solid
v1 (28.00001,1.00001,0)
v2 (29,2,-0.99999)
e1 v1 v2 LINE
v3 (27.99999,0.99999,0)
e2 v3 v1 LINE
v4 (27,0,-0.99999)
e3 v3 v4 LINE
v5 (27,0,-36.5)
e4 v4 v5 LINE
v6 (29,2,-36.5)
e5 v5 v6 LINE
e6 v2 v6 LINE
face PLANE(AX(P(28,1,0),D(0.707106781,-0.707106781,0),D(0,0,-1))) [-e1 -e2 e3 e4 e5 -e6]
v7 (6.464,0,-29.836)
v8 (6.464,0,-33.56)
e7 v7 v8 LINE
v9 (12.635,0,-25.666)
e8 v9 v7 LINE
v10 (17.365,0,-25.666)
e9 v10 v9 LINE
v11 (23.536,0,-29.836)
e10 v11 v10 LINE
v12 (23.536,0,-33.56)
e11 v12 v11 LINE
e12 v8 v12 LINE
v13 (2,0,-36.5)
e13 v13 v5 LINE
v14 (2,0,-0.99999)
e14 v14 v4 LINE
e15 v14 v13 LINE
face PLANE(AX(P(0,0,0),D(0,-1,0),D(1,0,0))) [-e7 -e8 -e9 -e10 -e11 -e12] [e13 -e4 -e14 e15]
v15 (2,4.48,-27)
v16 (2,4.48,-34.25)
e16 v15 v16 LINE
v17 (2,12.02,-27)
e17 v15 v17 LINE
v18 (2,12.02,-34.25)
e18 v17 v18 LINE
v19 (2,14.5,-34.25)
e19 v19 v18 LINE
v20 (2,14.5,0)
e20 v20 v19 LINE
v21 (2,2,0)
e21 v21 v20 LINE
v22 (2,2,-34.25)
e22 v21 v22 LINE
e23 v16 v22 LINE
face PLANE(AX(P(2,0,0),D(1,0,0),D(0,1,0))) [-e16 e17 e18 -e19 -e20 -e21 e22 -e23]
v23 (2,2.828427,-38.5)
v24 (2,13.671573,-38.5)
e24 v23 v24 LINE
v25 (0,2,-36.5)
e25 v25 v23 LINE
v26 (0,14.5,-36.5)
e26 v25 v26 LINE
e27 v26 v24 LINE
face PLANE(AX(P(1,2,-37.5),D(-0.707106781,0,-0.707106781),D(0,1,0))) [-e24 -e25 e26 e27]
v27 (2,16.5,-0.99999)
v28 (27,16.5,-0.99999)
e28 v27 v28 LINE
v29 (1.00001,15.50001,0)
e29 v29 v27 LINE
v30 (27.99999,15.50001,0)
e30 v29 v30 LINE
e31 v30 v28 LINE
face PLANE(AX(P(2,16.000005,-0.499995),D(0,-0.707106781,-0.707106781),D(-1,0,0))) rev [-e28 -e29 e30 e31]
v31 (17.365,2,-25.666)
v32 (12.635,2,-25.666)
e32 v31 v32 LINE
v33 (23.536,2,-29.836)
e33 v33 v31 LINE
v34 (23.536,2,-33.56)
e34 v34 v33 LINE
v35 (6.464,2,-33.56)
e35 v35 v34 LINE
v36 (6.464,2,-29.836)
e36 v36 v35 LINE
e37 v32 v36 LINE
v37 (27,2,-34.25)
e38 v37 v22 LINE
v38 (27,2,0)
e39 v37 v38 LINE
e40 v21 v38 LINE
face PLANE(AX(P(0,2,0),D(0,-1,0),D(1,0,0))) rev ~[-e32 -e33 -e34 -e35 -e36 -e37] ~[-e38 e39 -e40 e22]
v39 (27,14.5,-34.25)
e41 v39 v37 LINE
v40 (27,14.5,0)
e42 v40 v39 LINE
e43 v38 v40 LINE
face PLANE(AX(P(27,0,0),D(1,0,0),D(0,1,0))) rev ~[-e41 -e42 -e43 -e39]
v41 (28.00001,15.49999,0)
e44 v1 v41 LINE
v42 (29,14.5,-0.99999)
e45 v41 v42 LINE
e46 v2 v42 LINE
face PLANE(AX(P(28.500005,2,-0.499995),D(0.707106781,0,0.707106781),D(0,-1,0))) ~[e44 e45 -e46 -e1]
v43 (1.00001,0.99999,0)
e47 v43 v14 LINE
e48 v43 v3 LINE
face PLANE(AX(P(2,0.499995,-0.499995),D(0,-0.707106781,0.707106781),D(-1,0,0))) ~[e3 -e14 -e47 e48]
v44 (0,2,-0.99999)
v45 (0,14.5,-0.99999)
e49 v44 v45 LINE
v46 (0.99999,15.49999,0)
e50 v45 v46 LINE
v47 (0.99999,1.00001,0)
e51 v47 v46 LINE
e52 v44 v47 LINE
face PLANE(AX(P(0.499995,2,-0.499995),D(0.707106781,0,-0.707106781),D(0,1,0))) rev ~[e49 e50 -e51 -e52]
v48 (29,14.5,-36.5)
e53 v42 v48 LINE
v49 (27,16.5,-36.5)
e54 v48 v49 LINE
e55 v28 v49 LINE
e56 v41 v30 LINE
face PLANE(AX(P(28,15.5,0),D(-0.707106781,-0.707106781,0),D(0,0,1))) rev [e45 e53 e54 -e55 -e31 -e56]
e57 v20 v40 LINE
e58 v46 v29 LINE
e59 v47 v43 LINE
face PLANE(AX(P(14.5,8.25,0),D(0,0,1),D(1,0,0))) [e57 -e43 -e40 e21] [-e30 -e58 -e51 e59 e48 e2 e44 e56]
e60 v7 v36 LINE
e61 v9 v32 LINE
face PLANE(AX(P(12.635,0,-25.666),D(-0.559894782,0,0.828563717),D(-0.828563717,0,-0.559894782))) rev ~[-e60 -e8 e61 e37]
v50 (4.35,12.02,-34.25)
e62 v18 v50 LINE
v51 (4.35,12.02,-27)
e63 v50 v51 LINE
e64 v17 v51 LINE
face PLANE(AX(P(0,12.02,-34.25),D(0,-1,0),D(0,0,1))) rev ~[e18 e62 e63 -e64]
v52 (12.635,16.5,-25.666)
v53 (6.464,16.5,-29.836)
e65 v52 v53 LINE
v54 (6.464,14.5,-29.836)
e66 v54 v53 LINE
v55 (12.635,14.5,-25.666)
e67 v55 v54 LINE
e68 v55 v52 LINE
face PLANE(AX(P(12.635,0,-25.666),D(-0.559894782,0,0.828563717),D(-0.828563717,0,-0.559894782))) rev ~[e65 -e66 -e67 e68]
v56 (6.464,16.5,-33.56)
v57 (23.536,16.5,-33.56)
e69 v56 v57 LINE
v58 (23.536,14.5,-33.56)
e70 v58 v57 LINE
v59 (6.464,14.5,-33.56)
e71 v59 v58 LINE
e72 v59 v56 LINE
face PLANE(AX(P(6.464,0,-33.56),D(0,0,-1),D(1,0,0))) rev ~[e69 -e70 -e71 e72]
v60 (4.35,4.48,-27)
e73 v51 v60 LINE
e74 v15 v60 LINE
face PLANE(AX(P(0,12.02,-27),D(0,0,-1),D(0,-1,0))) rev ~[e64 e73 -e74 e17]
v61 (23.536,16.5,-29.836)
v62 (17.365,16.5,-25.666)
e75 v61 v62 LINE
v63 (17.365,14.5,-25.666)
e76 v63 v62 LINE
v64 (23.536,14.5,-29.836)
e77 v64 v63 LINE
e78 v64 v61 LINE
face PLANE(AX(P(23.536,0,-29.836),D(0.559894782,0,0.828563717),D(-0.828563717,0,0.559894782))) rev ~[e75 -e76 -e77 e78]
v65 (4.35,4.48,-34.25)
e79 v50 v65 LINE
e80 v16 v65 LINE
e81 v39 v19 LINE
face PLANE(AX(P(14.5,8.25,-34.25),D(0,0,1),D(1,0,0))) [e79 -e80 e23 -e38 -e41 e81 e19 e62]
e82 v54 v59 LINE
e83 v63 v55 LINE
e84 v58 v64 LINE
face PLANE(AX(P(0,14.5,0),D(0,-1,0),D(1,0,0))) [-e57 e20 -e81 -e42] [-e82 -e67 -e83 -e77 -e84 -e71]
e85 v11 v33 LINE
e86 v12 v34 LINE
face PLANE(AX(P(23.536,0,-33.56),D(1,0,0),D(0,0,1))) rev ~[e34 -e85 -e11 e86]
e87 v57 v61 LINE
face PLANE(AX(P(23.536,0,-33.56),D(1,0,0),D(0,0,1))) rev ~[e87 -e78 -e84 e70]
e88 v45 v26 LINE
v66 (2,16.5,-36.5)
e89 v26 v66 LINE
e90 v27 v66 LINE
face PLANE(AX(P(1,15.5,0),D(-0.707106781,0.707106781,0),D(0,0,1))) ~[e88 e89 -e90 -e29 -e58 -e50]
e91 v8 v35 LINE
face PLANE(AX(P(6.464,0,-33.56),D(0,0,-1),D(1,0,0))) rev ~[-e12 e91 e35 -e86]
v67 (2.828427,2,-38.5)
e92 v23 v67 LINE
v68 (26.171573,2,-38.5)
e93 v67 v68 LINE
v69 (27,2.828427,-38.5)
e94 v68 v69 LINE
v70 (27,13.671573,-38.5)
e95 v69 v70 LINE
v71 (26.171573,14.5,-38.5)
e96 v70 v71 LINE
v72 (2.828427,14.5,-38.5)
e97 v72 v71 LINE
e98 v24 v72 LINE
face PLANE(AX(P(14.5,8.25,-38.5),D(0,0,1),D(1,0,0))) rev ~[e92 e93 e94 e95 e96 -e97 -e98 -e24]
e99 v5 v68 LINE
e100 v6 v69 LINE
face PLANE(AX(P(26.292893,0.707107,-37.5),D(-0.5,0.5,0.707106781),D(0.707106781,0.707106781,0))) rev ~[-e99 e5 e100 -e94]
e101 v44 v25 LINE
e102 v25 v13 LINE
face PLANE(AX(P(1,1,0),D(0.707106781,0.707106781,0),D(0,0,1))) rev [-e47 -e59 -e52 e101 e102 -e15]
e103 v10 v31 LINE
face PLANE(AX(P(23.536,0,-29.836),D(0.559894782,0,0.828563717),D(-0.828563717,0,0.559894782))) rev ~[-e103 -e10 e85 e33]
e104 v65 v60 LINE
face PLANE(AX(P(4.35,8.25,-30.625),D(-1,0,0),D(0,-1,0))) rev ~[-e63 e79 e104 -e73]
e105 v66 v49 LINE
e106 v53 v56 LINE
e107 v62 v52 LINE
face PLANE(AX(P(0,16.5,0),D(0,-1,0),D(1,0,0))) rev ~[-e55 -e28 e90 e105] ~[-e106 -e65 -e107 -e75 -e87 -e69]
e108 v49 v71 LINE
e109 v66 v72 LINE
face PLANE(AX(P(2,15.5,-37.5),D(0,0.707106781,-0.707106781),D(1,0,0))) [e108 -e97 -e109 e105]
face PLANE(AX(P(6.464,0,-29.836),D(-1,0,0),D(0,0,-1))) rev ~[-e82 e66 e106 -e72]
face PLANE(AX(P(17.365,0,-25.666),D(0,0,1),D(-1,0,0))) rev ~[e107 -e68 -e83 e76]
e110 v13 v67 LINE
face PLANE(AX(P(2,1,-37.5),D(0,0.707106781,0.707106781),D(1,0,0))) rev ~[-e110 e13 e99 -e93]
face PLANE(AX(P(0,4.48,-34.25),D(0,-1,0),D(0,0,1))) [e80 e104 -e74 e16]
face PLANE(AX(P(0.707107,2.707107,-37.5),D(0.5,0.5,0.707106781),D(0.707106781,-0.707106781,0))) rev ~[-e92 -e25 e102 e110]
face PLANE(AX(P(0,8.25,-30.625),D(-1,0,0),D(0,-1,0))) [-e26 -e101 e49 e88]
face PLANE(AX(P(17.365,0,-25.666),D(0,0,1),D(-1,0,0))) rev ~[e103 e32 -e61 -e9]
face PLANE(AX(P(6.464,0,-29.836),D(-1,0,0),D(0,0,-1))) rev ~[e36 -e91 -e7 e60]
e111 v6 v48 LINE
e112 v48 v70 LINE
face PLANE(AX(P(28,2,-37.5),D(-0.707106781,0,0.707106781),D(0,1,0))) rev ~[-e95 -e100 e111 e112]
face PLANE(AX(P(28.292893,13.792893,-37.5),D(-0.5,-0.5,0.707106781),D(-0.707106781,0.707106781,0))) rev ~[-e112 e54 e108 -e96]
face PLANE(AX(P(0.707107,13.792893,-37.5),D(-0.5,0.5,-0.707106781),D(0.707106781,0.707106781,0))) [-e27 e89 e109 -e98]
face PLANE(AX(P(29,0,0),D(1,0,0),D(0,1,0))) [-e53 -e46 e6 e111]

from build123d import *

# Parameters (mm, degrees)
F0_W      = 29
F0_H      = 16.5
F1_DEPTH  = 38.5
F2_T      = -2
F3_DEPTH  = 2.25
F4_SIZE   = 2
F5_SIZE   = 2
F6_SIZE   = 0.99999
F8_DEPTH  = 16.501
F9_W      = 7.54
F9_H      = 7.25
F9_R      = 1.1
F10_DEPTH = 4.35


# Not quite as in the source:
# - a fillet or chamfer is up to 0.001 mm smaller than in the source, because OpenCascade refuses the exact size


with BuildPart() as f1:
    # F0 (on Top) → F1 (new body)
    with BuildSketch(Plane.XY):
        with Locations((14.5, 8.25)):
            Rectangle(F0_W, F0_H)
    extrude(amount=-F1_DEPTH)

    # F2
    f2_openings = [f1.faces().sort_by_distance(p)[0] for p in [
        (14.5, 8.25, 0),
    ]]
    offset(amount=F2_T, openings=f2_openings)

    # F3 (add): a face of the model
    f3_faces = [f1.faces().sort_by_distance(p)[0] for p in [
        (14.5, 8.25, -36.5),
    ]]
    extrude(f3_faces, amount=F3_DEPTH)

    # F4
    f4_edges = [f1.edges().sort_by_distance(p)[0] for p in [
        (29, 0, -19.25),
        (0, 0, -19.25),
        (0, 16.5, -19.25),
        (29, 16.5, -19.25),
    ]]
    chamfer(f4_edges, length=F4_SIZE)

    # F5
    f5_edges = [f1.edges().sort_by_distance(p)[0] for p in [
        (0, 8.25, -38.5),
        (1, 15.5, -38.5),
        (1, 1, -38.5),
        (14.5, 16.5, -38.5),
        (14.5, 0, -38.5),
        (28, 15.5, -38.5),
        (28, 1, -38.5),
        (29, 8.25, -38.5),
    ]]
    chamfer(f5_edges, length=F5_SIZE)

    # F6 (size 1 in the source; OpenCascade refuses exactly that, so slightly less here)
    f6_edges = [f1.edges().sort_by_distance(p)[0] for p in [
        (0, 8.25, 0),
        (14.5, 16.5, 0),
        (29, 8.25, 0),
        (14.5, 0, 0),
    ]]
    chamfer(f6_edges, length=F6_SIZE)

    # F7 (on face) → F8 (cut, through all)
    with BuildSketch(Plane.XZ):
        Polygon((23.536, -33.56), (23.536, -29.836), (17.365, -25.666), (12.635, -25.666), (6.464, -29.836), (6.464, -33.56), align=None)
    extrude(amount=-F8_DEPTH, mode=Mode.SUBTRACT)

    # F9 (on face) → F10 (join)
    with BuildSketch(Plane(origin=(0, 0, 0), x_dir=(0, -1, 0), z_dir=(-1, 0, 0))):
        with Locations((-8.25, -30.625)):
            Rectangle(F9_W, F9_H)
        with Locations((-8.25, -29.5)):
            Circle(F9_R, mode=Mode.SUBTRACT)
        with Locations((-8.25, -29.5)):
            Circle(F9_R)
    extrude(amount=-F10_DEPTH)


solid = f1.part
